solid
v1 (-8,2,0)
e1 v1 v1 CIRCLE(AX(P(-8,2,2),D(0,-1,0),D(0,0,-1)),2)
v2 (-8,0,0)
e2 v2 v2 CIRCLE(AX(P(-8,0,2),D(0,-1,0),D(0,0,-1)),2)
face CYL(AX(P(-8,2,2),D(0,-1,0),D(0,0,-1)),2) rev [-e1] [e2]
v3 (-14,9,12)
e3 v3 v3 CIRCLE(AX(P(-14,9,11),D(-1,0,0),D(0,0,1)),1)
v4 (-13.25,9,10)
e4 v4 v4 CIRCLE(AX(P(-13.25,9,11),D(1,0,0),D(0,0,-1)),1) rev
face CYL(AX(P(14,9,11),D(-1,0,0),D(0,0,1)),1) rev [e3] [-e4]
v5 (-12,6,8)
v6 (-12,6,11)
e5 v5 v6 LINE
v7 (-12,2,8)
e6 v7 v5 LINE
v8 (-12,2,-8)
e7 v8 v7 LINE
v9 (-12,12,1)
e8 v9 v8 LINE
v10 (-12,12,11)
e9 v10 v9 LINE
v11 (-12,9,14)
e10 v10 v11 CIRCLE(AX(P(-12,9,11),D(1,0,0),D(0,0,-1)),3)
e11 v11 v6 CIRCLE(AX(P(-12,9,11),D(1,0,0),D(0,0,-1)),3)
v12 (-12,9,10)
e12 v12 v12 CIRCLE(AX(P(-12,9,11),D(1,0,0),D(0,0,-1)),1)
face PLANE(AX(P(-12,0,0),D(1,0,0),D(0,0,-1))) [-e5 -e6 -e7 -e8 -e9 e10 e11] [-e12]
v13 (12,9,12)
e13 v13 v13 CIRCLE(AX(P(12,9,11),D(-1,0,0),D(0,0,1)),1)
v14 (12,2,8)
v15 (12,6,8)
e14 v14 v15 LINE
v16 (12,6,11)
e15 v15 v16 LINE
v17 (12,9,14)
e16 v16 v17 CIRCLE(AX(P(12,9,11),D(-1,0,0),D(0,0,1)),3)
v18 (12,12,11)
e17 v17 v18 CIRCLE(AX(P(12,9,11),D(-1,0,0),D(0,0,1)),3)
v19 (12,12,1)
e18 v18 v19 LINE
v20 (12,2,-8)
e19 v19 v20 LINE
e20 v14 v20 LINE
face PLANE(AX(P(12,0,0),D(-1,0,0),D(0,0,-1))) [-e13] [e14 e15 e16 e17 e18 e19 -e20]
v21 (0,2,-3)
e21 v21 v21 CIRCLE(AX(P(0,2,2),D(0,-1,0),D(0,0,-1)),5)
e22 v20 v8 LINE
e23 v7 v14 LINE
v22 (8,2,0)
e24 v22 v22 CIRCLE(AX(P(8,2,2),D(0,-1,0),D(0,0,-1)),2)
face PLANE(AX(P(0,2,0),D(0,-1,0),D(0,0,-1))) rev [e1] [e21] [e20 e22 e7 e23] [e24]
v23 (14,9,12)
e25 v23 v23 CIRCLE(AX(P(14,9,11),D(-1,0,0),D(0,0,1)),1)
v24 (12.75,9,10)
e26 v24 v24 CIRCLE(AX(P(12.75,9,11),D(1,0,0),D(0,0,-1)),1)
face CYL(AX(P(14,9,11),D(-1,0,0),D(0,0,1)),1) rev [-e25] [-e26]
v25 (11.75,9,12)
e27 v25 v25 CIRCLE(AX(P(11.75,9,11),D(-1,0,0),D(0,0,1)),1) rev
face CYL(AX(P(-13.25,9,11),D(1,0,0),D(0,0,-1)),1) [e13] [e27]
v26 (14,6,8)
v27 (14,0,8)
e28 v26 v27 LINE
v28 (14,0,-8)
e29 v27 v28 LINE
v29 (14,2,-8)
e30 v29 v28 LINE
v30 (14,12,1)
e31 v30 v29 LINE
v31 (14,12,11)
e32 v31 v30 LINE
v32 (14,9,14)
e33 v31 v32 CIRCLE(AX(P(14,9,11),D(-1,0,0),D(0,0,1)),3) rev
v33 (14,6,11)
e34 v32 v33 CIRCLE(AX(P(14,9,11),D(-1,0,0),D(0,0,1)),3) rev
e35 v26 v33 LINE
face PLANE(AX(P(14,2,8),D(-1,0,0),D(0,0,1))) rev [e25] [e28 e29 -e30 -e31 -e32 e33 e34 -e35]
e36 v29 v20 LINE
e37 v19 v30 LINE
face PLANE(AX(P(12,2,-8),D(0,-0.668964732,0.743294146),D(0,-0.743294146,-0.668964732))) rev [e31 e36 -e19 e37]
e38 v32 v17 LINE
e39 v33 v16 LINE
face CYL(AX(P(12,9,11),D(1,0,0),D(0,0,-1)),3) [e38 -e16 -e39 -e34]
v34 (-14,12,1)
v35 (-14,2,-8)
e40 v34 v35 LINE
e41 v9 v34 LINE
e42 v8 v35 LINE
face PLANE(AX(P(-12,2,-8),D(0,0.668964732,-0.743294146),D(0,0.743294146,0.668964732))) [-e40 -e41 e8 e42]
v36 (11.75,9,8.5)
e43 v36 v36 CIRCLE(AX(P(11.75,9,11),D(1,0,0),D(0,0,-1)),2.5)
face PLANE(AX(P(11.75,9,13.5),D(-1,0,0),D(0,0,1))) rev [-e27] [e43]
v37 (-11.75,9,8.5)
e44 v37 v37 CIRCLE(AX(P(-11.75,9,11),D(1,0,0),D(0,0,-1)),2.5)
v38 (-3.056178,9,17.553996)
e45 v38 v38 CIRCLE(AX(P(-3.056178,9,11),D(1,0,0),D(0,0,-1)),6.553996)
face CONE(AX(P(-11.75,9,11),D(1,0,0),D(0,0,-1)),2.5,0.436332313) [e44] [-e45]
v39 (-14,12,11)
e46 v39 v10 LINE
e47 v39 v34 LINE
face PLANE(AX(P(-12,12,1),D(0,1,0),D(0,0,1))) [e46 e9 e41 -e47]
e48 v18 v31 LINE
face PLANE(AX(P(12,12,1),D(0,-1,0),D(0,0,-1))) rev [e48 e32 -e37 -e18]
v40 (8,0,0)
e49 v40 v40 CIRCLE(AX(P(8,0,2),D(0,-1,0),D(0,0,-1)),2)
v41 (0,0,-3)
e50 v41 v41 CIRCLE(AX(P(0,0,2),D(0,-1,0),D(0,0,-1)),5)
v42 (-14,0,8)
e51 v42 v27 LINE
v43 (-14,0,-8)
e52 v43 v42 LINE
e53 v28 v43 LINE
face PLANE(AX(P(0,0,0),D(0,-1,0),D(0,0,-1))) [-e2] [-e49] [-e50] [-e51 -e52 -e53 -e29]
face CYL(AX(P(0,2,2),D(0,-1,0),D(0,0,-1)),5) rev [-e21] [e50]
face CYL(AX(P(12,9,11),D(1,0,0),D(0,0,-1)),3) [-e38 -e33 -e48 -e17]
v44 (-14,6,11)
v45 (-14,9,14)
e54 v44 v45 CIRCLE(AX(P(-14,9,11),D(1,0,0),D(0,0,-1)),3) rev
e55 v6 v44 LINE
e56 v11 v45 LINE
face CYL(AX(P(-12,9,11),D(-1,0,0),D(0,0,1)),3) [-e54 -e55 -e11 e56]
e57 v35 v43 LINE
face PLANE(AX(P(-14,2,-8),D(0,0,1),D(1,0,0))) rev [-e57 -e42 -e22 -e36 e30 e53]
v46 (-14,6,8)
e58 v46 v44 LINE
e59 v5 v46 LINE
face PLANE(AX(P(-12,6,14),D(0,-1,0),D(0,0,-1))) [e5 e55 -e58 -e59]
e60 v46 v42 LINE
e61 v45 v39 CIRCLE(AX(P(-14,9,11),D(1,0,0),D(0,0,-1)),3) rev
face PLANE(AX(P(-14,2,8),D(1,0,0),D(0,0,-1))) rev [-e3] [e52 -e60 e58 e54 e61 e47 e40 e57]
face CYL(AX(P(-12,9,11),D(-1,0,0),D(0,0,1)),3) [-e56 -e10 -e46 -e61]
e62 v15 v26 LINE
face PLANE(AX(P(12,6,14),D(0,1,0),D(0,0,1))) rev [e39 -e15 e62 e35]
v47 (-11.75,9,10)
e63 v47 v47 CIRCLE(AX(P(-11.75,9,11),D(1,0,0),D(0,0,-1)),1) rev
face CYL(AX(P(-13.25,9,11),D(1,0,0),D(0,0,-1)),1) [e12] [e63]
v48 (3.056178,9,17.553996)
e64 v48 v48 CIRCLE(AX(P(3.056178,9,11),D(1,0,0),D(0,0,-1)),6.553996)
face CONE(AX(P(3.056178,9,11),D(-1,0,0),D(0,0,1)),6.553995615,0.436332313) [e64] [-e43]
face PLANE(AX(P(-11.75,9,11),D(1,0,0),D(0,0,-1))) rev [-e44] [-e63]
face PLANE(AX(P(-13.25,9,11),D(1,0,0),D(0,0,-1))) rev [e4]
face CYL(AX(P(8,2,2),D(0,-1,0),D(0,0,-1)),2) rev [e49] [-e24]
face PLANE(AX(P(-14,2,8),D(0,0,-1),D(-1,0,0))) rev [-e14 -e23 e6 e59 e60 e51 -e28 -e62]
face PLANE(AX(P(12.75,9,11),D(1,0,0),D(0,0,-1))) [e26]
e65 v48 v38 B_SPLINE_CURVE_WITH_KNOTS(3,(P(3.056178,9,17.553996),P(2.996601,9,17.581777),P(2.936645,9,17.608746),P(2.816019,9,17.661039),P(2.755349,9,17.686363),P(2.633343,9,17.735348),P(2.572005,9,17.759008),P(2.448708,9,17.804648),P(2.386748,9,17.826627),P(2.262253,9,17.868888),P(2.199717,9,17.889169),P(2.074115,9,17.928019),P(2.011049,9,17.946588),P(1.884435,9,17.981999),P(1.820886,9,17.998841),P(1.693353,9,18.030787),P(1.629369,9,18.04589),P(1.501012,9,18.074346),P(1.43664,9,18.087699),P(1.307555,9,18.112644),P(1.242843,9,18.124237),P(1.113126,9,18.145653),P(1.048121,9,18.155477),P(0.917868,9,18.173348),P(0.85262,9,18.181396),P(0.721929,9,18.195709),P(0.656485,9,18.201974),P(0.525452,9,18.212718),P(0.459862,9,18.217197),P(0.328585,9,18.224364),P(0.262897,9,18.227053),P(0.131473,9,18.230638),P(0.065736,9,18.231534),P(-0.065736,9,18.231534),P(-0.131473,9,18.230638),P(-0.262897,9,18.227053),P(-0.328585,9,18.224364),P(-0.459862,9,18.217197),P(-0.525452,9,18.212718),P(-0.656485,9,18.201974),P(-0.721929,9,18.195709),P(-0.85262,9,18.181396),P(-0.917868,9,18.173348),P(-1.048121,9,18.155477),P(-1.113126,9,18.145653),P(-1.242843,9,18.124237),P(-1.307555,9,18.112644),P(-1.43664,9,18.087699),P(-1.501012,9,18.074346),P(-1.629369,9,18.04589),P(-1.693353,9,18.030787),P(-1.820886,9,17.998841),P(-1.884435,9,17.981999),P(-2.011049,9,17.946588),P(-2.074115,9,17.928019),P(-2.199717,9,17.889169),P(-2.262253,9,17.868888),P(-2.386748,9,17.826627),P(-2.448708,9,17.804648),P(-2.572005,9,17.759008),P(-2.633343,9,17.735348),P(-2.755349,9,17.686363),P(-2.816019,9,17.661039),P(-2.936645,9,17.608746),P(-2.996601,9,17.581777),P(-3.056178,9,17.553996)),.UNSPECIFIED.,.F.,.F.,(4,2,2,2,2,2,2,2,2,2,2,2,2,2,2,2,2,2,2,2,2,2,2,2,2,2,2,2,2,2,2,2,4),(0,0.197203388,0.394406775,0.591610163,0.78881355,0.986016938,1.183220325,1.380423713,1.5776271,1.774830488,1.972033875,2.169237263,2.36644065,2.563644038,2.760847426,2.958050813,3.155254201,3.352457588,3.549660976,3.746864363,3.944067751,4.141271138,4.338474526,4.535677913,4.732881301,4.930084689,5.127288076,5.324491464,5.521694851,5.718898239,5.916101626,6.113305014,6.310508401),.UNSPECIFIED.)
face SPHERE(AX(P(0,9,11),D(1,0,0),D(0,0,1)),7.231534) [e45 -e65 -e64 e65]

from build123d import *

# Parameters (mm, degrees)
SKETCH_1_W           = 28
SKETCH_1_H           = 16
EXTRUDE_1_DEPTH      = 2
EXTRUDE_2_DEPTH      = 2
FILLET_1_R           = 3
SKETCH_3_R           = 1
CUT_EXTRUDE_1_DEPTH  = 34.526109228
EXTRUDE_3_DEPTH      = 1
EXTRUDE_3_DEPTH_BACK = 25
SKETCH_5_R           = 1
SKETCH_6_R           = 2
SKETCH_6_R_2         = 5
CUT_EXTRUDE_2_DEPTH  = 2


with BuildPart() as part:
    # 草图1 → 凸台-拉伸1 (new body)
    with BuildSketch(Plane(origin=(0, 0, 0), x_dir=(1, 0, 0), z_dir=(0, 1, 0))):
        Rectangle(SKETCH_1_W, SKETCH_1_H)
    extrude(amount=EXTRUDE_1_DEPTH)

    # 草图2 → 凸台-拉伸2 (add)
    with BuildSketch(Plane.ZY.offset(14)):
        Polygon((-8, 0), (-8, 2), (1, 12), (14, 12), (14, 6), (8, 6), (8, 2), (8, 0), align=None)
    extrude_2 = extrude(amount=-EXTRUDE_2_DEPTH)

    # 镜向1: 凸台-拉伸2 across plane
    add(extrude_2.mirror(Plane(origin=(0, 0, 0), x_dir=(0, 0, 1), z_dir=(1, 0, 0))))

    # 圆角1
    fillet_1_edges = [part.edges().sort_by_distance(p)[0] for p in [
        (13, 6, 14),
        (13, 12, 14),
        (-13, 6, 14),
        (-13, 12, 14),
    ]]
    fillet(fillet_1_edges, radius=FILLET_1_R - 0.0001)  # a hair under: the kernel refuses the full size

    # 草图3 → 切除-拉伸1 (cut, through all)
    with BuildSketch(Plane.ZY.offset(14)):
        with Locations((11, 9)):
            Circle(SKETCH_3_R)
    extrude(amount=-CUT_EXTRUDE_1_DEPTH, mode=Mode.SUBTRACT)



with BuildPart() as body_2:
    # 草图4 → 旋转2 (revolve)
    with BuildSketch(Plane(origin=(0, 9, 0), x_dir=(1, 0, 0), z_dir=(0, 1, 0))):
        with BuildLine():
            Line((-11.75, -11), (-11.75, -13.5))
            Line((-11.75, -13.5), (-3.056178347, -17.553995615))
            ThreePointArc((-3.056178347, -17.553995615), (0, -18.231534043), (3.056178347, -17.553995615))
            Line((3.056178347, -17.553995615), (11.75, -13.5))
            Line((11.75, -13.5), (11.75, -11))
            Line((11.75, -11), (-11.75, -11))
        make_face()
    revolve(axis=Axis((14, 9, 11), (-1, 0, 0)))


with BuildPart() as part_1:
    add(part.part)

    add(body_2.part)  # 凸台-拉伸3 merges body 2
    # 草图5 → 凸台-拉伸3 (add, two sides: drawn at the far end of the back side and taken through both)
    with BuildSketch(Plane(origin=(11.75, 0, 0), x_dir=(0, 0, -1), z_dir=(1, 0, 0)).offset(-EXTRUDE_3_DEPTH_BACK)):
        with Locations(Location((-11, 9, 0), (0, 0, 180))):
            Circle(SKETCH_5_R)
    extrude(amount=EXTRUDE_3_DEPTH + EXTRUDE_3_DEPTH_BACK)

    # 草图6 → 切除-拉伸2 (cut)
    with BuildSketch(Plane.XZ):
        with Locations(Location((-8, 2, 0), (0, 0, 270))):
            Circle(SKETCH_6_R)
        with Locations(Location((8, 2, 0), (0, 0, 270))):
            Circle(SKETCH_6_R)
        with Locations(Location((0, 2, 0), (0, 0, 270))):
            Circle(SKETCH_6_R_2)
    extrude(amount=-CUT_EXTRUDE_2_DEPTH, mode=Mode.SUBTRACT)


solid = part_1.part
